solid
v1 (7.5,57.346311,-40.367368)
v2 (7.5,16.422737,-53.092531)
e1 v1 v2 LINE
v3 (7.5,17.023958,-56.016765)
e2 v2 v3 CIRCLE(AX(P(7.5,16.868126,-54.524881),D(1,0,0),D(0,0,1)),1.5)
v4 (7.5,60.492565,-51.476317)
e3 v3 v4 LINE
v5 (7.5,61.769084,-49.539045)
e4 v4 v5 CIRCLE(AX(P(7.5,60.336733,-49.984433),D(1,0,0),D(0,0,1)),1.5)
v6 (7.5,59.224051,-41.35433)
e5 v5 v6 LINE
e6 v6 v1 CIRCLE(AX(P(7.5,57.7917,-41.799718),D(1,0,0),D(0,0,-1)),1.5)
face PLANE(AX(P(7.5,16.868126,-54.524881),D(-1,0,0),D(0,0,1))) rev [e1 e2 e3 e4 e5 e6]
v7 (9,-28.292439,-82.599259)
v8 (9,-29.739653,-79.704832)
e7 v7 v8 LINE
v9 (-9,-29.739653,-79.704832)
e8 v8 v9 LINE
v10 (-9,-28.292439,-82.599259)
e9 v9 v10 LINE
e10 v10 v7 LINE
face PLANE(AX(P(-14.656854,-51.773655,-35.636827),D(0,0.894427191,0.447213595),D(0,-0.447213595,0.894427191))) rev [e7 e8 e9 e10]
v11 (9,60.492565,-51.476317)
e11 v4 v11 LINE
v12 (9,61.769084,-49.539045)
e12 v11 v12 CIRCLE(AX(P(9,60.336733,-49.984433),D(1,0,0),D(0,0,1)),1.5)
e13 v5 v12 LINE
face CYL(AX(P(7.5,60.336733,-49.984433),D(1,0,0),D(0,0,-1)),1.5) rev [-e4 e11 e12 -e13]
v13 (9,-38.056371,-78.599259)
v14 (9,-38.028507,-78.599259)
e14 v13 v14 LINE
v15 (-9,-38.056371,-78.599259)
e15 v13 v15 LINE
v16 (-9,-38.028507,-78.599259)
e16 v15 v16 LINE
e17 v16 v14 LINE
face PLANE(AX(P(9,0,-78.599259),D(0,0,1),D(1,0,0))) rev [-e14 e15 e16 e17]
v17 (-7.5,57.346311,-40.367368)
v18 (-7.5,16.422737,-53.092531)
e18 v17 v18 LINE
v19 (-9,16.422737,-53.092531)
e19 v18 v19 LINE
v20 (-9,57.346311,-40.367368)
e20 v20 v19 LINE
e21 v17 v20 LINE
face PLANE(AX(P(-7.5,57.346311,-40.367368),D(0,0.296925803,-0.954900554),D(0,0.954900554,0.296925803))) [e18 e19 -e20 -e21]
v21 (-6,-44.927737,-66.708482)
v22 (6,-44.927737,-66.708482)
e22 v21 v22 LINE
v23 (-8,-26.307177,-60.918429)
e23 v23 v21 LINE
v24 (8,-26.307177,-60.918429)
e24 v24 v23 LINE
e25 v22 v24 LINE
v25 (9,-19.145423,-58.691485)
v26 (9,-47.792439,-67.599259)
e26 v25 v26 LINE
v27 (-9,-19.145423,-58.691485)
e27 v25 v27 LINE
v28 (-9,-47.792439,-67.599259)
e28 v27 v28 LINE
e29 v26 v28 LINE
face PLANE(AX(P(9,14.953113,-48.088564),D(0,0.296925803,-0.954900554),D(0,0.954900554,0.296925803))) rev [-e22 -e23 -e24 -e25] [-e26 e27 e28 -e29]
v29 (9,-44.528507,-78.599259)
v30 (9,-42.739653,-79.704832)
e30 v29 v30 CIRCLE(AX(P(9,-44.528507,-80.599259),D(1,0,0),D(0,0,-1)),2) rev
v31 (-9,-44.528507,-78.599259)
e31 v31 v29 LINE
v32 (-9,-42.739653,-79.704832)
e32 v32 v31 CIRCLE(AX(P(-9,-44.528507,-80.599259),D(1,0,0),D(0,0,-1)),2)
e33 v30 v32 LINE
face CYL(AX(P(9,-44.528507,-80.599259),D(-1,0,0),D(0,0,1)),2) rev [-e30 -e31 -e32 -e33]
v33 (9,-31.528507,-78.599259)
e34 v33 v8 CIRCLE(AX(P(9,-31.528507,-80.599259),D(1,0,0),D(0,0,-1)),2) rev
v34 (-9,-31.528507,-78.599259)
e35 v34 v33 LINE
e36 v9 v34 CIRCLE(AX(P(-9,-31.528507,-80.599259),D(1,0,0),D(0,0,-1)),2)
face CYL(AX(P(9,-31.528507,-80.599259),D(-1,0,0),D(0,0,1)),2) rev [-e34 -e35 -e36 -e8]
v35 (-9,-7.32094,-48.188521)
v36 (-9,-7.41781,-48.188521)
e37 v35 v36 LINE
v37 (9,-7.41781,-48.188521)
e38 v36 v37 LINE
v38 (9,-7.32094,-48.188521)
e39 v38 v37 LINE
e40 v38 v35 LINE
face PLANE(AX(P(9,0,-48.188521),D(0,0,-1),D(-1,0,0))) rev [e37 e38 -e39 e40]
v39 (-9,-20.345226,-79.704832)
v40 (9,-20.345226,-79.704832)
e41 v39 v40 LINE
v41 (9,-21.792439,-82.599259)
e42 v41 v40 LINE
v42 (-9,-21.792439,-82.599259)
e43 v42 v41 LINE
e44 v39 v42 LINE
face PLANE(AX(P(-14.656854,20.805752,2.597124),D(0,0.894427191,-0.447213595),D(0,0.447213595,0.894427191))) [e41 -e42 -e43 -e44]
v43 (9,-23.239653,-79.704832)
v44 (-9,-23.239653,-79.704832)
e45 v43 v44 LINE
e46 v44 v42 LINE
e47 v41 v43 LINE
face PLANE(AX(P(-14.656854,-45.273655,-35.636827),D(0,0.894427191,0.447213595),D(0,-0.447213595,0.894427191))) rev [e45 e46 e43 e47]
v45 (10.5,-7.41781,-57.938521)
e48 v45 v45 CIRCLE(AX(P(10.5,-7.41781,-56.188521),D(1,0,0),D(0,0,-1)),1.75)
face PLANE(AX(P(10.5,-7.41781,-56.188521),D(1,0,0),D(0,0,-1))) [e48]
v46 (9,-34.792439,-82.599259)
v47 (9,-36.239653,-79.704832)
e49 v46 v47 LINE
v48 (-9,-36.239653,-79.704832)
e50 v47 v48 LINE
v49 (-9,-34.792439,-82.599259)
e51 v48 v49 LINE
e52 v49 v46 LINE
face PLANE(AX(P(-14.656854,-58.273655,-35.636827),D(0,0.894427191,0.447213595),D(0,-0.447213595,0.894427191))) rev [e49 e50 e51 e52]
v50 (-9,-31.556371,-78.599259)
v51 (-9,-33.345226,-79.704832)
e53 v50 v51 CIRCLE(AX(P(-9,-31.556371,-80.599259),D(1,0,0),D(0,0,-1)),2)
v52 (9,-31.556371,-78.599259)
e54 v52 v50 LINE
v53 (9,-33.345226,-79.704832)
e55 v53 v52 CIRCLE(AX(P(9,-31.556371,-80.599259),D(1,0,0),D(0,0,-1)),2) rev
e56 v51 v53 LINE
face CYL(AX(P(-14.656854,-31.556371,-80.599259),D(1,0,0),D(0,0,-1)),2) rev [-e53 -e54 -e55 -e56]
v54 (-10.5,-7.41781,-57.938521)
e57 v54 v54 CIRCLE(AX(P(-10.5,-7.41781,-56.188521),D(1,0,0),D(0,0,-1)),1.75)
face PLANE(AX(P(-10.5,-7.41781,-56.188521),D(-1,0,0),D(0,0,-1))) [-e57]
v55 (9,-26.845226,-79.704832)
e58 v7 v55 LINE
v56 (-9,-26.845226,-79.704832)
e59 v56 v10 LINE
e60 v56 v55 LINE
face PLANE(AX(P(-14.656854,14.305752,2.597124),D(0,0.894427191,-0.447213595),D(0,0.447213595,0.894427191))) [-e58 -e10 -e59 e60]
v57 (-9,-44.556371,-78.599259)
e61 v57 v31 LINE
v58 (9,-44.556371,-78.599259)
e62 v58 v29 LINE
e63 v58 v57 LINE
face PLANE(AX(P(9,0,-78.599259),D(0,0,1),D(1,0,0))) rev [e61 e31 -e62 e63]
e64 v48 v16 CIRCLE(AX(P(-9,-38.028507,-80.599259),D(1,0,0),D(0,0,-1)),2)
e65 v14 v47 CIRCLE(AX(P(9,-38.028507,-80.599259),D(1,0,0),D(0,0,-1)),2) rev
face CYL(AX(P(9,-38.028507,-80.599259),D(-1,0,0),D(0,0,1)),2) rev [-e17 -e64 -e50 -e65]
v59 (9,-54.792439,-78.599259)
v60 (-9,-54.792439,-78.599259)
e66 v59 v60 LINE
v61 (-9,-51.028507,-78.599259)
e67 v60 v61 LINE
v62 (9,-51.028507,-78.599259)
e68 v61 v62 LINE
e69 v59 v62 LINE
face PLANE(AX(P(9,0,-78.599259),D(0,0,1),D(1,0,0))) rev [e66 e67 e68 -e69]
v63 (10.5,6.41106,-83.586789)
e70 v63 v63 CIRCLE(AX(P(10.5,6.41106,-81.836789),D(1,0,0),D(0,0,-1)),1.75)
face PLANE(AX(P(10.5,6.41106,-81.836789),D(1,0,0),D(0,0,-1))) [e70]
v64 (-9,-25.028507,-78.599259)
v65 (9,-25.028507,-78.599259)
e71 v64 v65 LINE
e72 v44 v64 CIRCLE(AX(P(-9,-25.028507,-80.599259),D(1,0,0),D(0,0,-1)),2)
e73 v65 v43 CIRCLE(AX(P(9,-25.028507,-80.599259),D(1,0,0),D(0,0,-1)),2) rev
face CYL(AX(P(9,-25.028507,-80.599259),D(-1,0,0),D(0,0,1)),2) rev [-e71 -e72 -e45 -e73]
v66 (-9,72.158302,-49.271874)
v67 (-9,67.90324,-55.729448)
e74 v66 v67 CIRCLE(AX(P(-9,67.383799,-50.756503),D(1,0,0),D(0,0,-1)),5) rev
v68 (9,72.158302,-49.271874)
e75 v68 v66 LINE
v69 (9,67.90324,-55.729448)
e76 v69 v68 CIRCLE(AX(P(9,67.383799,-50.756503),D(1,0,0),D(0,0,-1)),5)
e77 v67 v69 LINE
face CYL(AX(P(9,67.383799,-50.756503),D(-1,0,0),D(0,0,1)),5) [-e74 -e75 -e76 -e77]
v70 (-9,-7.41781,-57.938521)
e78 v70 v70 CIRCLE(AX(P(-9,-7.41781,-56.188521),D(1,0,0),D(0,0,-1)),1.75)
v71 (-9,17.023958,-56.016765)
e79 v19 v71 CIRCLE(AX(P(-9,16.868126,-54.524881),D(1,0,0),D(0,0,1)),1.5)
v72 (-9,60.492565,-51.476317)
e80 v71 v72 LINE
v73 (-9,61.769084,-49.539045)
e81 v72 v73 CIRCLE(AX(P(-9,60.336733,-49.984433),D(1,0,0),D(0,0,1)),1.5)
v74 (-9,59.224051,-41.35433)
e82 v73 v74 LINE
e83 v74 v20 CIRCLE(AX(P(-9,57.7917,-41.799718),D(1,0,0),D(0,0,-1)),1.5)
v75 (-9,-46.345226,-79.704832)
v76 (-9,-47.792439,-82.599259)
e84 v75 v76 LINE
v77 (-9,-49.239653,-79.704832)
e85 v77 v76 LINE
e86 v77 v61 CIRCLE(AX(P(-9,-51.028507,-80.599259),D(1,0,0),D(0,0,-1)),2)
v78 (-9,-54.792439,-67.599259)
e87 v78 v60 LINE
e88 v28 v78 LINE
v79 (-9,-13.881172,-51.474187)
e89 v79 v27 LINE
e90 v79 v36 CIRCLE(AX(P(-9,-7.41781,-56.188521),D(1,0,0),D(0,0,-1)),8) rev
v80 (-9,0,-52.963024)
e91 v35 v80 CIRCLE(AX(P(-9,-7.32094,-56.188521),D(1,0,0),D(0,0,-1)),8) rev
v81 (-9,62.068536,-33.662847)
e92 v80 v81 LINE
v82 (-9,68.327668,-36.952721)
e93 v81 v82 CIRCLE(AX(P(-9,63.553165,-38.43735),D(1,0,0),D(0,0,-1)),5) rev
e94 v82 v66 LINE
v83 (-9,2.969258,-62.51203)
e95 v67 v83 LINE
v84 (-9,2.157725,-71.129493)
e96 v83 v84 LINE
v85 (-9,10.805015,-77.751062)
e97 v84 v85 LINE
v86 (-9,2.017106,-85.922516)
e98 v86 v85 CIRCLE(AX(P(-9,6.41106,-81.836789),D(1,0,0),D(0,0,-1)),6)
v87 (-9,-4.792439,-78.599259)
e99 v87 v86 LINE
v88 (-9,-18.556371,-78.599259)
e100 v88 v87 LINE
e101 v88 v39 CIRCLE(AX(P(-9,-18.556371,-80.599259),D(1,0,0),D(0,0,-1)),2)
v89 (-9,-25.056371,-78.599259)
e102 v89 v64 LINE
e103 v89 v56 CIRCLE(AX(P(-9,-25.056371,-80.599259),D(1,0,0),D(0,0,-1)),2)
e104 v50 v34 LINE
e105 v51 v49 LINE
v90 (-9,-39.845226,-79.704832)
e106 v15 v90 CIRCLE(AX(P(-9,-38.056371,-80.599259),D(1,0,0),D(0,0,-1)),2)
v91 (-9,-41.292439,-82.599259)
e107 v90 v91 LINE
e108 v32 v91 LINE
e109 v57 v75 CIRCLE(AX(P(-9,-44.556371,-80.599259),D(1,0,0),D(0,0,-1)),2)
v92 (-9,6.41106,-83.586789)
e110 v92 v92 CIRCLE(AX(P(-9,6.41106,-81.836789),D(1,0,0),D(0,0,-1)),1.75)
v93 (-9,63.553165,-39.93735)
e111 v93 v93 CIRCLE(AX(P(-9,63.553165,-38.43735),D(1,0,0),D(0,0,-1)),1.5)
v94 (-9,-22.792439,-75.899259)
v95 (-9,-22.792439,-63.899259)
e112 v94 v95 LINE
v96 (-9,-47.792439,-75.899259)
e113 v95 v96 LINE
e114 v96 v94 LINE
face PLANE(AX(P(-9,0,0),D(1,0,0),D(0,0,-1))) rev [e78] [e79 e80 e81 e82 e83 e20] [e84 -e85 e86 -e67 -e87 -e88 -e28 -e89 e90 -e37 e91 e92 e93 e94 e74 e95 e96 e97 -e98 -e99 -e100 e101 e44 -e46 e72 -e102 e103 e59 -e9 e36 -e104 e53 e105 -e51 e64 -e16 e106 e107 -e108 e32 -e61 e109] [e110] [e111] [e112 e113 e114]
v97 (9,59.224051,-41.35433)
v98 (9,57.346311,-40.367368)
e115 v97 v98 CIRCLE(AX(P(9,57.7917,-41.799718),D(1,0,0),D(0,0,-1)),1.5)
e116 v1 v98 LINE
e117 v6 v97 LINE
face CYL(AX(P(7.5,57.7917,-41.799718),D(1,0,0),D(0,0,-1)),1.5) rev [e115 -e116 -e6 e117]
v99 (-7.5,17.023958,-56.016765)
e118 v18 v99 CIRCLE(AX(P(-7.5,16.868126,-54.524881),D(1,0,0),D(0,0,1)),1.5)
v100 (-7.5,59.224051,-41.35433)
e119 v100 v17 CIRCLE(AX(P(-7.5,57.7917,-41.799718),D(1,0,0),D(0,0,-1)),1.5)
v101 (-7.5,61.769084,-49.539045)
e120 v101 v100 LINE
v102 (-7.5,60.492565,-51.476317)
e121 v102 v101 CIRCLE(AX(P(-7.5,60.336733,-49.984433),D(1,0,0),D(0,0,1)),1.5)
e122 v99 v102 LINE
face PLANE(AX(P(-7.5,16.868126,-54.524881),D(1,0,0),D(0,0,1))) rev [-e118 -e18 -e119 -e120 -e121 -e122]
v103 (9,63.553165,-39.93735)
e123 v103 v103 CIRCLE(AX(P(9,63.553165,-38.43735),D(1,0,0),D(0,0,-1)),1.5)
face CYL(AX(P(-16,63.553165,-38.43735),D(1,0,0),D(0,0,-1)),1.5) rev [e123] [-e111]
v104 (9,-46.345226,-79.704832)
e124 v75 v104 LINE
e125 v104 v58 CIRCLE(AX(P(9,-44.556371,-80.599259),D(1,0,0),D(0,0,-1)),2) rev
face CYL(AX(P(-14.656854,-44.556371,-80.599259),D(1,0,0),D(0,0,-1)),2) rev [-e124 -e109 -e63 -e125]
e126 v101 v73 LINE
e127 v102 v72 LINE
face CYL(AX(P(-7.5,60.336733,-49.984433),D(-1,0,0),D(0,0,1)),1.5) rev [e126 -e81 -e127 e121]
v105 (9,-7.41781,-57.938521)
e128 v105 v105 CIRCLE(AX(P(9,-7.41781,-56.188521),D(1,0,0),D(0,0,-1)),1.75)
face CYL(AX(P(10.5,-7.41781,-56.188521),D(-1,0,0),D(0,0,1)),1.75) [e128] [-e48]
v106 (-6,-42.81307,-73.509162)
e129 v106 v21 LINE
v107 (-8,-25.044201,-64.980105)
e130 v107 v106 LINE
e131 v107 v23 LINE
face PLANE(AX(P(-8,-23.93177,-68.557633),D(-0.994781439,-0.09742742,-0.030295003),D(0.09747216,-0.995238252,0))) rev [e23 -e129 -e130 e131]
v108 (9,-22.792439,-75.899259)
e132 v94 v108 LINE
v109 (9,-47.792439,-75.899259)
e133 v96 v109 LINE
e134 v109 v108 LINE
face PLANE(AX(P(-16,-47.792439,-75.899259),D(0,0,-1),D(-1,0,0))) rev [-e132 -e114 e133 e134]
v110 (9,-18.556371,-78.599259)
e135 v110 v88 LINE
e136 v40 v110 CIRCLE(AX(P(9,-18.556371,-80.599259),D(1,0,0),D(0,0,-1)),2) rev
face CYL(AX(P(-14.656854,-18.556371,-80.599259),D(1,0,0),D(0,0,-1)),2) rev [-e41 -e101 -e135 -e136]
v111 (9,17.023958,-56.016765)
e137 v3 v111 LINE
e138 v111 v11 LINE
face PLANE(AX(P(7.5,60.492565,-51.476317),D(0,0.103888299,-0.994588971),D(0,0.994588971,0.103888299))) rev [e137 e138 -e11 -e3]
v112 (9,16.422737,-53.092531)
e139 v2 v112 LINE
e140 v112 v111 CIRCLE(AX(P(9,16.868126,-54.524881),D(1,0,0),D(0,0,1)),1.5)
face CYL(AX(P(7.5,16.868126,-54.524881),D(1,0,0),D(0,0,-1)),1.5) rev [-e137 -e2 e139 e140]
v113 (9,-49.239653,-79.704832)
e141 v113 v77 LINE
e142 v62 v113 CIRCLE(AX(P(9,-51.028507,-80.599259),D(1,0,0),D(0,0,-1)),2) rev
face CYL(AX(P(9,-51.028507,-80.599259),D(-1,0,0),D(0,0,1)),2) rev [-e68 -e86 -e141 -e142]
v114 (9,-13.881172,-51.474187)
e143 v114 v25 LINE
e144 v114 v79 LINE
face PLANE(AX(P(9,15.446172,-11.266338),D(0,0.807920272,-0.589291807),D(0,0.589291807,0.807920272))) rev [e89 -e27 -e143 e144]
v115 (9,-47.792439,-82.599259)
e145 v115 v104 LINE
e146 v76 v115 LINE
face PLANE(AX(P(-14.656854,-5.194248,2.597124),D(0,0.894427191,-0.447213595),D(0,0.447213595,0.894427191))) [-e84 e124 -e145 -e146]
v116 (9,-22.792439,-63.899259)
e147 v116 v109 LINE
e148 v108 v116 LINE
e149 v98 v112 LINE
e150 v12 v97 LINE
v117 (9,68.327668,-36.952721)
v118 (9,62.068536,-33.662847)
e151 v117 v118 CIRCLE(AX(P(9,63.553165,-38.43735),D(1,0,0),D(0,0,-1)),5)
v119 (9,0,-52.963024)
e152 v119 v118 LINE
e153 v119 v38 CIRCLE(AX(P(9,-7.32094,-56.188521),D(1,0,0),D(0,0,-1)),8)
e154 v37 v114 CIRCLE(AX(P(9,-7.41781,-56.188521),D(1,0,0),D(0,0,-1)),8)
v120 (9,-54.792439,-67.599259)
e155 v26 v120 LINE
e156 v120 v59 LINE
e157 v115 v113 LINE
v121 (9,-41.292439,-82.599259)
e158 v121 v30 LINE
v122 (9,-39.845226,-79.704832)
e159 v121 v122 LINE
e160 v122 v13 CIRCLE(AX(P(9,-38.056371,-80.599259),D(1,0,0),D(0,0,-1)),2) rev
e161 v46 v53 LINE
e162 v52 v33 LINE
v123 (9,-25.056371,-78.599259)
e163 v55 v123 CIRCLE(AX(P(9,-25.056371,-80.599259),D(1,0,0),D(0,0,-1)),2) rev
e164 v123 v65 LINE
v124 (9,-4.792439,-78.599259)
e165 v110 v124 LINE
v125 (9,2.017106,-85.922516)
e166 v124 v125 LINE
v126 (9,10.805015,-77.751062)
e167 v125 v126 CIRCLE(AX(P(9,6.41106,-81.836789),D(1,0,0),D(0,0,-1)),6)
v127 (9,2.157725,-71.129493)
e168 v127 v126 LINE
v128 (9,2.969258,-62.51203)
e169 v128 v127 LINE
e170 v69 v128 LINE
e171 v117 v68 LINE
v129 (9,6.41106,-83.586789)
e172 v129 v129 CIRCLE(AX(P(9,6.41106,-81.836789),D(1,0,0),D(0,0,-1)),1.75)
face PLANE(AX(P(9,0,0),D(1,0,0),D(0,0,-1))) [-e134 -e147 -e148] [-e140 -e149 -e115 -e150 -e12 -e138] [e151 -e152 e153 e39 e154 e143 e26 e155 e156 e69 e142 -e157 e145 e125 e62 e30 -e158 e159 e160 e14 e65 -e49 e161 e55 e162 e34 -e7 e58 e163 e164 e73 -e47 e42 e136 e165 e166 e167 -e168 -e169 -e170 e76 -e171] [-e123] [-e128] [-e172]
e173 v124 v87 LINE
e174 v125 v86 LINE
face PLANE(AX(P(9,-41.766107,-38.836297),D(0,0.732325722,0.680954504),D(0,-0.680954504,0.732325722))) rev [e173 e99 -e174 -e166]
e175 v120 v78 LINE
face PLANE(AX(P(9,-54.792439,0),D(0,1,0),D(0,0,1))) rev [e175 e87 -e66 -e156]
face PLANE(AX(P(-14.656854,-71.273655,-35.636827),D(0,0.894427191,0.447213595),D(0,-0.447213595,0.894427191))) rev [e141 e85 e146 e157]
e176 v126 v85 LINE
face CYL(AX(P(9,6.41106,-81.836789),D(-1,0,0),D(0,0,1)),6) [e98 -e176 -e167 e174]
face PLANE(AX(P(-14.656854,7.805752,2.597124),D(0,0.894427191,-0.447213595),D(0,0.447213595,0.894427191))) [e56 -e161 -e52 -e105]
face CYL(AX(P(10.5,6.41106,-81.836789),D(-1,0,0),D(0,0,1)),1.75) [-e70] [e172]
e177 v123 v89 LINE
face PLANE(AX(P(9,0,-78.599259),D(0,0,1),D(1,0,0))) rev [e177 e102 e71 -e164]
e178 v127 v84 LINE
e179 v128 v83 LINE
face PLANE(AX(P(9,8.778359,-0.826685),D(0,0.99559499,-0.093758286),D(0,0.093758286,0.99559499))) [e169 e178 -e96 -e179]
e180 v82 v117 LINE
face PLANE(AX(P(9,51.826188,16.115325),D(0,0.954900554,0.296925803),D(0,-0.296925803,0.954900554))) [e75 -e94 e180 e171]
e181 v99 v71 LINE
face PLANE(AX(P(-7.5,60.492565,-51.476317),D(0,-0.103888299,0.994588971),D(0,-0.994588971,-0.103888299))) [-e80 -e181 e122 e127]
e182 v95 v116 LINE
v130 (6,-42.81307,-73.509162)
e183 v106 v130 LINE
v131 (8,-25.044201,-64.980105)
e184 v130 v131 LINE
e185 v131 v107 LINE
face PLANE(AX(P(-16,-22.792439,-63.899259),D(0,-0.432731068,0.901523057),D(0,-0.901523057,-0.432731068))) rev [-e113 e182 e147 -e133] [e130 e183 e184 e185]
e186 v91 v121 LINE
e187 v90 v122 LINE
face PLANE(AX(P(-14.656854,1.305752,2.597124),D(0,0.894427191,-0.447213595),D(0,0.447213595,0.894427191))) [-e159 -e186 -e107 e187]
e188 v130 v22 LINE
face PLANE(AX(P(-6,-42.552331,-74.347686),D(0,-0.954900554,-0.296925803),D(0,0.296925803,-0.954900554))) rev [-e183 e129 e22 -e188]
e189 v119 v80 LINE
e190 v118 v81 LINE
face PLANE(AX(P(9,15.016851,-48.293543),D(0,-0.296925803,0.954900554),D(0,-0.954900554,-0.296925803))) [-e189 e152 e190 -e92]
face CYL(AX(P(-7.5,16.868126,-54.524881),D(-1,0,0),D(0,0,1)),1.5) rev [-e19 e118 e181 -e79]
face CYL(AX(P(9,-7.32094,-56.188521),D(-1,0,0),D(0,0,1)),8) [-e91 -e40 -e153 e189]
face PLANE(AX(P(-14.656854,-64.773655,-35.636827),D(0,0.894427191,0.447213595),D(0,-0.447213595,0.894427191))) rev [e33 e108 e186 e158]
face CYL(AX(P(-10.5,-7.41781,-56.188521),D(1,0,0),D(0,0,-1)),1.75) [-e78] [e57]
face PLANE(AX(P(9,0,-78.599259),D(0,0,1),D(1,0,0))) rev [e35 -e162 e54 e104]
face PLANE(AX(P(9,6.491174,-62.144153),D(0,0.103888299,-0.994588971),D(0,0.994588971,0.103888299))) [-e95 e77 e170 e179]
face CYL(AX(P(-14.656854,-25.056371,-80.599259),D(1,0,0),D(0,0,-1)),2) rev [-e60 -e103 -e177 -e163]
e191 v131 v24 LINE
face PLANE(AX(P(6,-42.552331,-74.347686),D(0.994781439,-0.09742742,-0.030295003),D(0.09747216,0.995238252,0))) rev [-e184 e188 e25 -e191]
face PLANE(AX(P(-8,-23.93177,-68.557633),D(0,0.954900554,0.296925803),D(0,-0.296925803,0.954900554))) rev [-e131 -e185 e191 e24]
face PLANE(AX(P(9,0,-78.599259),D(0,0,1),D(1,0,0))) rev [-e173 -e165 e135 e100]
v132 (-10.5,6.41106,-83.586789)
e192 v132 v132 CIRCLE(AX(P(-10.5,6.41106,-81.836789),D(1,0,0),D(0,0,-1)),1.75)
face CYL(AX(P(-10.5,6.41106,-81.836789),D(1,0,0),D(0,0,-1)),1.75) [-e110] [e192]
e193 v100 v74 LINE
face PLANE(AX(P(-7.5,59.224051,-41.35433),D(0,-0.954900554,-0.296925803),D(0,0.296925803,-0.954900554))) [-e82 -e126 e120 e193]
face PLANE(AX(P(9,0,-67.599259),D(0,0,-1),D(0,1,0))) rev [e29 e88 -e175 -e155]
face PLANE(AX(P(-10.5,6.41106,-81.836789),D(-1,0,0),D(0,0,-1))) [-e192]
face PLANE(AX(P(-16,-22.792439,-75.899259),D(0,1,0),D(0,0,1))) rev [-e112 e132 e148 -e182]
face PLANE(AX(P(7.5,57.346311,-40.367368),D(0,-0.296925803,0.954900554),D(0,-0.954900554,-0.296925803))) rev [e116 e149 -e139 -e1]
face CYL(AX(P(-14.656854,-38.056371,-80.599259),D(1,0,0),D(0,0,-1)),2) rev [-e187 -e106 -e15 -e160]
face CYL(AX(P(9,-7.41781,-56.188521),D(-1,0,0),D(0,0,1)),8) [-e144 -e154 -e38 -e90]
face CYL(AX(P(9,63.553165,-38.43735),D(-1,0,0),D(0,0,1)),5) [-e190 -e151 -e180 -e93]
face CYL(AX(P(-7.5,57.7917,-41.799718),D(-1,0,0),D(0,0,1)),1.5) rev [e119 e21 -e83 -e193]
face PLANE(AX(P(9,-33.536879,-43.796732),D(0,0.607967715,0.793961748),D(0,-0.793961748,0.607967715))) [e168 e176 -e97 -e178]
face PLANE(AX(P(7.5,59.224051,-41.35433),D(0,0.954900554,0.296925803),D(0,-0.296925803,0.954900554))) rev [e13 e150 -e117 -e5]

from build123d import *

# Parameters (mm, degrees)
BOSS_EXTRUDE1_DEPTH    = 9
CUT_EXTRUDE1_DEPTH     = 25
BOSS_EXTRUDE2_DEPTH    = 18
FILLET1_R              = 2
LPATTERN1_COUNT        = 5
LPATTERN1_PITCH        = 6.5
FILLET1_OF_LPATTERN1_R = 2
FILLET2_R              = 8
FILLET3_R              = 5
SKETCH4_R              = 1.5
CUT_EXTRUDE2_DEPTH     = 25
CUT_EXTRUDE3_DEPTH     = 8
SKETCH6_R              = 1.75
BOSS_EXTRUDE3_DEPTH    = 1.5
SKETCH7_R              = 1.75
BOSS_EXTRUDE4_DEPTH    = 1.5
CUT_EXTRUDE4_DEPTH     = 1.5


with BuildPart() as part:
    # Sketch1 → Boss-Extrude1 (new, symmetric)
    with BuildSketch(Plane(origin=(0, 0, 0), x_dir=(0, 0, -1), z_dir=(1, 0, 0))):
        Polygon((78.599259113, -4.792439116), (85.922516335, 2.017105925), (77.751062285, 10.805014591), (71.129492545, 2.15772468), (62.512029777, 2.969258034), (52.963024241, 0), (48.188521473, -1.484629017), (48.188521473, -11.484629017), (58.691485012, -19.145422508), (67.599259113, -47.792439116), (67.599259113, -54.792439116), (78.599259113, -54.792439116), align=None)
        Polygon((62.512029777, 2.969258034), (52.963024241, 0), (32.178218004, 66.843038752), (55.09583129, 73.969258034), align=None)
        with BuildLine():
            Line((85.922516335, 2.017105925), (77.751062285, 10.805014591))
            ThreePointArc((77.751062285, 10.805014591), (86.230743643, 10.496787283), (85.922516335, 2.017105925))
        make_face()
    extrude(amount=BOSS_EXTRUDE1_DEPTH, both=True)

    # Sketch2 → Cut-Extrude1 (cut)
    with BuildSketch(Plane(origin=(9, 0, 0), x_dir=(0, 0, -1), z_dir=(1, 0, 0))):
        Polygon((75.899259113, -47.792439116), (75.899259113, -22.792439116), (63.899259113, -22.792439116), align=None)
    extrude(amount=-CUT_EXTRUDE1_DEPTH, mode=Mode.SUBTRACT)

    # Sketch3 → Boss-Extrude2 (add)
    with BuildSketch(Plane(origin=(9, 0, 0), x_dir=(0, 0, -1), z_dir=(1, 0, 0))):
        Polygon((78.599259113, -47.792439116), (78.599259113, -49.792439116), (82.599259113, -47.792439116), align=None)
        Polygon((78.599259113, -45.792439116), (78.599259113, -47.792439116), (82.599259113, -47.792439116), align=None)
    boss_extrude2 = extrude(amount=-BOSS_EXTRUDE2_DEPTH)

    # Fillet1
    fillet1_edges = [part.edges().sort_by_distance(p)[0] for p in [
        (0, -49.792439116, -78.599259113),
        (0, -45.792439116, -78.599259113),
    ]]
    fillet(fillet1_edges, radius=FILLET1_R)

    # LPattern1: Boss-Extrude2 ×5
    with Locations(*[(0, i * LPATTERN1_PITCH, 0) for i in range(1, LPATTERN1_COUNT)]):
        add(boss_extrude2)

    # Fillet1 of LPattern1
    fillet1_of_lpattern1_edges = [part.edges().sort_by_distance(p)[0] for p in [
        (0, -43.292439116, -78.599259113),
        (0, -39.292439116, -78.599259113),
        (0, -36.792439116, -78.599259113),
        (0, -32.792439116, -78.599259113),
        (0, -30.292439116, -78.599259113),
        (0, -26.292439116, -78.599259113),
        (0, -23.792439116, -78.599259113),
        (0, -19.792439116, -78.599259113),
    ]]
    fillet(fillet1_of_lpattern1_edges, radius=FILLET1_OF_LPATTERN1_R)

    # Fillet2
    # the kernel refuses this fillet: 8 mm, written as the material it takes off along each edge
    with BuildSketch(Plane(origin=(-19.167047595, -11.484629017, -48.188521473), x_dir=(0, -0.5892918069975562, -0.8079202721838058), z_dir=(1, 0, 0))) as fillet2_piece_1:
        with BuildLine():
            CenterArc((FILLET2_R * 0.508352379737, FILLET2_R), FILLET2_R, 216.10676877, 53.89323123)
            Line((-FILLET2_R * 0.299567892447, FILLET2_R * 0.410708193002), (-FILLET2_R * 0.31572629789, FILLET2_R * 0.398922356862))
            Line((-FILLET2_R * 0.31572629789, FILLET2_R * 0.398922356862), (-FILLET2_R * 0.0101670475947, -FILLET2_R * 0.02))
            Line((-FILLET2_R * 0.0101670475947, -FILLET2_R * 0.02), (FILLET2_R * 0.508352379737, -FILLET2_R * 0.02))
            Line((FILLET2_R * 0.508352379737, -FILLET2_R * 0.02), (FILLET2_R * 0.508352379737, 0))
        make_face()
    extrude(amount=38.334095189, mode=Mode.SUBTRACT)
    with BuildSketch(Plane(origin=(-23.590778332, -1.484629017, -48.188521473), x_dir=(0, -1, 0), z_dir=(1, 0, 0))) as fillet2_piece_2:
        with BuildLine():
            CenterArc((5.836311333, 8), FILLET2_R, 203.777574667, 66.222425333)
            Line((-1.484629017, 4.774502768), (-1.631047824, 4.709992823))
            ThreePointArc((-1.631047824, 4.709992823), (-0.895098597, 2.339743255), (-0.152784089, -0.047508129))
            Line((-0.152784089, -0.047508129), (0, -0.16))
            Line((0, -0.16), (5.836311333, -0.16))
            Line((5.836311333, -0.16), (5.836311333, 0))
        make_face()
    extrude(amount=47.181556665, mode=Mode.SUBTRACT)

    # Fillet3
    fillet3_edges = [part.edges().sort_by_distance(p)[0] for p in [
        (0, 66.843038752, -32.178218004),
        (0, 73.969258034, -55.09583129),
    ]]
    fillet(fillet3_edges, radius=FILLET3_R)

    # Sketch4 → Cut-Extrude2 (cut)
    with BuildSketch(Plane(origin=(9, 0, 0), x_dir=(0, 0, -1), z_dir=(1, 0, 0))):
        with Locations((38.437349789, 63.553165001)):
            Circle(SKETCH4_R)
    extrude(amount=-CUT_EXTRUDE2_DEPTH, mode=Mode.SUBTRACT)

    # Sketch5 → Cut-Extrude3 (cut)
    with BuildSketch(Plane(origin=(0, 14.953112663, -48.088564203), x_dir=(1, 0, 0), z_dir=(0, -0.29692580339417163, 0.95490055360688))):
        Polygon((-8, -43.208990891), (8, -43.208990891), (6, -62.708990891), (-6, -62.708990891), align=None)
    extrude(amount=-CUT_EXTRUDE3_DEPTH, mode=Mode.SUBTRACT)

    # Sketch6 → Boss-Extrude3 (add)
    with BuildSketch(Plane(origin=(9, 0, 0), x_dir=(0, 0, -1), z_dir=(1, 0, 0))):
        with Locations((81.83678931, 6.411060258)):
            Circle(SKETCH6_R)
    boss_extrude3 = extrude(amount=BOSS_EXTRUDE3_DEPTH)

    # Sketch7 → Boss-Extrude4 (add)
    with BuildSketch(Plane(origin=(9, 0, 0), x_dir=(0, 0, -1), z_dir=(1, 0, 0))):
        with Locations((56.188521473, -7.417809979)):
            Circle(SKETCH7_R)
    boss_extrude4 = extrude(amount=BOSS_EXTRUDE4_DEPTH)

    # Sketch8 → Cut-Extrude4 (cut)
    with BuildSketch(Plane(origin=(9, 0, 0), x_dir=(0, 0, -1), z_dir=(1, 0, 0))):
        with BuildLine():
            Line((41.354329636, 59.224050938), (49.539044528, 61.769083545))
            ThreePointArc((49.539044528, 61.769083545), (50.809758993, 61.589265105), (51.476316689, 60.492565163))
            Line((51.476316689, 60.492565163), (56.016764829, 17.023958099))
            ThreePointArc((56.016764829, 17.023958099), (54.826962078, 15.398858062), (53.092530542, 16.422736945))
            Line((53.092530542, 16.422736945), (40.367367511, 57.346311403))
            ThreePointArc((40.367367511, 57.346311403), (40.471955982, 58.48958772), (41.354329636, 59.224050938))
        make_face()
    cut_extrude4 = extrude(amount=-CUT_EXTRUDE4_DEPTH, mode=Mode.SUBTRACT)

    # Mirror1: Boss-Extrude3, Boss-Extrude4, Cut-Extrude4 across plane
    add(boss_extrude3.mirror(Plane(origin=(0, 0, 0), x_dir=(0, 0, 1), z_dir=(1, 0, 0))))
    add(boss_extrude4.mirror(Plane(origin=(0, 0, 0), x_dir=(0, 0, 1), z_dir=(1, 0, 0))))
    add(cut_extrude4.mirror(Plane(origin=(0, 0, 0), x_dir=(0, 0, 1), z_dir=(1, 0, 0))), mode=Mode.SUBTRACT)


solid = part.part
